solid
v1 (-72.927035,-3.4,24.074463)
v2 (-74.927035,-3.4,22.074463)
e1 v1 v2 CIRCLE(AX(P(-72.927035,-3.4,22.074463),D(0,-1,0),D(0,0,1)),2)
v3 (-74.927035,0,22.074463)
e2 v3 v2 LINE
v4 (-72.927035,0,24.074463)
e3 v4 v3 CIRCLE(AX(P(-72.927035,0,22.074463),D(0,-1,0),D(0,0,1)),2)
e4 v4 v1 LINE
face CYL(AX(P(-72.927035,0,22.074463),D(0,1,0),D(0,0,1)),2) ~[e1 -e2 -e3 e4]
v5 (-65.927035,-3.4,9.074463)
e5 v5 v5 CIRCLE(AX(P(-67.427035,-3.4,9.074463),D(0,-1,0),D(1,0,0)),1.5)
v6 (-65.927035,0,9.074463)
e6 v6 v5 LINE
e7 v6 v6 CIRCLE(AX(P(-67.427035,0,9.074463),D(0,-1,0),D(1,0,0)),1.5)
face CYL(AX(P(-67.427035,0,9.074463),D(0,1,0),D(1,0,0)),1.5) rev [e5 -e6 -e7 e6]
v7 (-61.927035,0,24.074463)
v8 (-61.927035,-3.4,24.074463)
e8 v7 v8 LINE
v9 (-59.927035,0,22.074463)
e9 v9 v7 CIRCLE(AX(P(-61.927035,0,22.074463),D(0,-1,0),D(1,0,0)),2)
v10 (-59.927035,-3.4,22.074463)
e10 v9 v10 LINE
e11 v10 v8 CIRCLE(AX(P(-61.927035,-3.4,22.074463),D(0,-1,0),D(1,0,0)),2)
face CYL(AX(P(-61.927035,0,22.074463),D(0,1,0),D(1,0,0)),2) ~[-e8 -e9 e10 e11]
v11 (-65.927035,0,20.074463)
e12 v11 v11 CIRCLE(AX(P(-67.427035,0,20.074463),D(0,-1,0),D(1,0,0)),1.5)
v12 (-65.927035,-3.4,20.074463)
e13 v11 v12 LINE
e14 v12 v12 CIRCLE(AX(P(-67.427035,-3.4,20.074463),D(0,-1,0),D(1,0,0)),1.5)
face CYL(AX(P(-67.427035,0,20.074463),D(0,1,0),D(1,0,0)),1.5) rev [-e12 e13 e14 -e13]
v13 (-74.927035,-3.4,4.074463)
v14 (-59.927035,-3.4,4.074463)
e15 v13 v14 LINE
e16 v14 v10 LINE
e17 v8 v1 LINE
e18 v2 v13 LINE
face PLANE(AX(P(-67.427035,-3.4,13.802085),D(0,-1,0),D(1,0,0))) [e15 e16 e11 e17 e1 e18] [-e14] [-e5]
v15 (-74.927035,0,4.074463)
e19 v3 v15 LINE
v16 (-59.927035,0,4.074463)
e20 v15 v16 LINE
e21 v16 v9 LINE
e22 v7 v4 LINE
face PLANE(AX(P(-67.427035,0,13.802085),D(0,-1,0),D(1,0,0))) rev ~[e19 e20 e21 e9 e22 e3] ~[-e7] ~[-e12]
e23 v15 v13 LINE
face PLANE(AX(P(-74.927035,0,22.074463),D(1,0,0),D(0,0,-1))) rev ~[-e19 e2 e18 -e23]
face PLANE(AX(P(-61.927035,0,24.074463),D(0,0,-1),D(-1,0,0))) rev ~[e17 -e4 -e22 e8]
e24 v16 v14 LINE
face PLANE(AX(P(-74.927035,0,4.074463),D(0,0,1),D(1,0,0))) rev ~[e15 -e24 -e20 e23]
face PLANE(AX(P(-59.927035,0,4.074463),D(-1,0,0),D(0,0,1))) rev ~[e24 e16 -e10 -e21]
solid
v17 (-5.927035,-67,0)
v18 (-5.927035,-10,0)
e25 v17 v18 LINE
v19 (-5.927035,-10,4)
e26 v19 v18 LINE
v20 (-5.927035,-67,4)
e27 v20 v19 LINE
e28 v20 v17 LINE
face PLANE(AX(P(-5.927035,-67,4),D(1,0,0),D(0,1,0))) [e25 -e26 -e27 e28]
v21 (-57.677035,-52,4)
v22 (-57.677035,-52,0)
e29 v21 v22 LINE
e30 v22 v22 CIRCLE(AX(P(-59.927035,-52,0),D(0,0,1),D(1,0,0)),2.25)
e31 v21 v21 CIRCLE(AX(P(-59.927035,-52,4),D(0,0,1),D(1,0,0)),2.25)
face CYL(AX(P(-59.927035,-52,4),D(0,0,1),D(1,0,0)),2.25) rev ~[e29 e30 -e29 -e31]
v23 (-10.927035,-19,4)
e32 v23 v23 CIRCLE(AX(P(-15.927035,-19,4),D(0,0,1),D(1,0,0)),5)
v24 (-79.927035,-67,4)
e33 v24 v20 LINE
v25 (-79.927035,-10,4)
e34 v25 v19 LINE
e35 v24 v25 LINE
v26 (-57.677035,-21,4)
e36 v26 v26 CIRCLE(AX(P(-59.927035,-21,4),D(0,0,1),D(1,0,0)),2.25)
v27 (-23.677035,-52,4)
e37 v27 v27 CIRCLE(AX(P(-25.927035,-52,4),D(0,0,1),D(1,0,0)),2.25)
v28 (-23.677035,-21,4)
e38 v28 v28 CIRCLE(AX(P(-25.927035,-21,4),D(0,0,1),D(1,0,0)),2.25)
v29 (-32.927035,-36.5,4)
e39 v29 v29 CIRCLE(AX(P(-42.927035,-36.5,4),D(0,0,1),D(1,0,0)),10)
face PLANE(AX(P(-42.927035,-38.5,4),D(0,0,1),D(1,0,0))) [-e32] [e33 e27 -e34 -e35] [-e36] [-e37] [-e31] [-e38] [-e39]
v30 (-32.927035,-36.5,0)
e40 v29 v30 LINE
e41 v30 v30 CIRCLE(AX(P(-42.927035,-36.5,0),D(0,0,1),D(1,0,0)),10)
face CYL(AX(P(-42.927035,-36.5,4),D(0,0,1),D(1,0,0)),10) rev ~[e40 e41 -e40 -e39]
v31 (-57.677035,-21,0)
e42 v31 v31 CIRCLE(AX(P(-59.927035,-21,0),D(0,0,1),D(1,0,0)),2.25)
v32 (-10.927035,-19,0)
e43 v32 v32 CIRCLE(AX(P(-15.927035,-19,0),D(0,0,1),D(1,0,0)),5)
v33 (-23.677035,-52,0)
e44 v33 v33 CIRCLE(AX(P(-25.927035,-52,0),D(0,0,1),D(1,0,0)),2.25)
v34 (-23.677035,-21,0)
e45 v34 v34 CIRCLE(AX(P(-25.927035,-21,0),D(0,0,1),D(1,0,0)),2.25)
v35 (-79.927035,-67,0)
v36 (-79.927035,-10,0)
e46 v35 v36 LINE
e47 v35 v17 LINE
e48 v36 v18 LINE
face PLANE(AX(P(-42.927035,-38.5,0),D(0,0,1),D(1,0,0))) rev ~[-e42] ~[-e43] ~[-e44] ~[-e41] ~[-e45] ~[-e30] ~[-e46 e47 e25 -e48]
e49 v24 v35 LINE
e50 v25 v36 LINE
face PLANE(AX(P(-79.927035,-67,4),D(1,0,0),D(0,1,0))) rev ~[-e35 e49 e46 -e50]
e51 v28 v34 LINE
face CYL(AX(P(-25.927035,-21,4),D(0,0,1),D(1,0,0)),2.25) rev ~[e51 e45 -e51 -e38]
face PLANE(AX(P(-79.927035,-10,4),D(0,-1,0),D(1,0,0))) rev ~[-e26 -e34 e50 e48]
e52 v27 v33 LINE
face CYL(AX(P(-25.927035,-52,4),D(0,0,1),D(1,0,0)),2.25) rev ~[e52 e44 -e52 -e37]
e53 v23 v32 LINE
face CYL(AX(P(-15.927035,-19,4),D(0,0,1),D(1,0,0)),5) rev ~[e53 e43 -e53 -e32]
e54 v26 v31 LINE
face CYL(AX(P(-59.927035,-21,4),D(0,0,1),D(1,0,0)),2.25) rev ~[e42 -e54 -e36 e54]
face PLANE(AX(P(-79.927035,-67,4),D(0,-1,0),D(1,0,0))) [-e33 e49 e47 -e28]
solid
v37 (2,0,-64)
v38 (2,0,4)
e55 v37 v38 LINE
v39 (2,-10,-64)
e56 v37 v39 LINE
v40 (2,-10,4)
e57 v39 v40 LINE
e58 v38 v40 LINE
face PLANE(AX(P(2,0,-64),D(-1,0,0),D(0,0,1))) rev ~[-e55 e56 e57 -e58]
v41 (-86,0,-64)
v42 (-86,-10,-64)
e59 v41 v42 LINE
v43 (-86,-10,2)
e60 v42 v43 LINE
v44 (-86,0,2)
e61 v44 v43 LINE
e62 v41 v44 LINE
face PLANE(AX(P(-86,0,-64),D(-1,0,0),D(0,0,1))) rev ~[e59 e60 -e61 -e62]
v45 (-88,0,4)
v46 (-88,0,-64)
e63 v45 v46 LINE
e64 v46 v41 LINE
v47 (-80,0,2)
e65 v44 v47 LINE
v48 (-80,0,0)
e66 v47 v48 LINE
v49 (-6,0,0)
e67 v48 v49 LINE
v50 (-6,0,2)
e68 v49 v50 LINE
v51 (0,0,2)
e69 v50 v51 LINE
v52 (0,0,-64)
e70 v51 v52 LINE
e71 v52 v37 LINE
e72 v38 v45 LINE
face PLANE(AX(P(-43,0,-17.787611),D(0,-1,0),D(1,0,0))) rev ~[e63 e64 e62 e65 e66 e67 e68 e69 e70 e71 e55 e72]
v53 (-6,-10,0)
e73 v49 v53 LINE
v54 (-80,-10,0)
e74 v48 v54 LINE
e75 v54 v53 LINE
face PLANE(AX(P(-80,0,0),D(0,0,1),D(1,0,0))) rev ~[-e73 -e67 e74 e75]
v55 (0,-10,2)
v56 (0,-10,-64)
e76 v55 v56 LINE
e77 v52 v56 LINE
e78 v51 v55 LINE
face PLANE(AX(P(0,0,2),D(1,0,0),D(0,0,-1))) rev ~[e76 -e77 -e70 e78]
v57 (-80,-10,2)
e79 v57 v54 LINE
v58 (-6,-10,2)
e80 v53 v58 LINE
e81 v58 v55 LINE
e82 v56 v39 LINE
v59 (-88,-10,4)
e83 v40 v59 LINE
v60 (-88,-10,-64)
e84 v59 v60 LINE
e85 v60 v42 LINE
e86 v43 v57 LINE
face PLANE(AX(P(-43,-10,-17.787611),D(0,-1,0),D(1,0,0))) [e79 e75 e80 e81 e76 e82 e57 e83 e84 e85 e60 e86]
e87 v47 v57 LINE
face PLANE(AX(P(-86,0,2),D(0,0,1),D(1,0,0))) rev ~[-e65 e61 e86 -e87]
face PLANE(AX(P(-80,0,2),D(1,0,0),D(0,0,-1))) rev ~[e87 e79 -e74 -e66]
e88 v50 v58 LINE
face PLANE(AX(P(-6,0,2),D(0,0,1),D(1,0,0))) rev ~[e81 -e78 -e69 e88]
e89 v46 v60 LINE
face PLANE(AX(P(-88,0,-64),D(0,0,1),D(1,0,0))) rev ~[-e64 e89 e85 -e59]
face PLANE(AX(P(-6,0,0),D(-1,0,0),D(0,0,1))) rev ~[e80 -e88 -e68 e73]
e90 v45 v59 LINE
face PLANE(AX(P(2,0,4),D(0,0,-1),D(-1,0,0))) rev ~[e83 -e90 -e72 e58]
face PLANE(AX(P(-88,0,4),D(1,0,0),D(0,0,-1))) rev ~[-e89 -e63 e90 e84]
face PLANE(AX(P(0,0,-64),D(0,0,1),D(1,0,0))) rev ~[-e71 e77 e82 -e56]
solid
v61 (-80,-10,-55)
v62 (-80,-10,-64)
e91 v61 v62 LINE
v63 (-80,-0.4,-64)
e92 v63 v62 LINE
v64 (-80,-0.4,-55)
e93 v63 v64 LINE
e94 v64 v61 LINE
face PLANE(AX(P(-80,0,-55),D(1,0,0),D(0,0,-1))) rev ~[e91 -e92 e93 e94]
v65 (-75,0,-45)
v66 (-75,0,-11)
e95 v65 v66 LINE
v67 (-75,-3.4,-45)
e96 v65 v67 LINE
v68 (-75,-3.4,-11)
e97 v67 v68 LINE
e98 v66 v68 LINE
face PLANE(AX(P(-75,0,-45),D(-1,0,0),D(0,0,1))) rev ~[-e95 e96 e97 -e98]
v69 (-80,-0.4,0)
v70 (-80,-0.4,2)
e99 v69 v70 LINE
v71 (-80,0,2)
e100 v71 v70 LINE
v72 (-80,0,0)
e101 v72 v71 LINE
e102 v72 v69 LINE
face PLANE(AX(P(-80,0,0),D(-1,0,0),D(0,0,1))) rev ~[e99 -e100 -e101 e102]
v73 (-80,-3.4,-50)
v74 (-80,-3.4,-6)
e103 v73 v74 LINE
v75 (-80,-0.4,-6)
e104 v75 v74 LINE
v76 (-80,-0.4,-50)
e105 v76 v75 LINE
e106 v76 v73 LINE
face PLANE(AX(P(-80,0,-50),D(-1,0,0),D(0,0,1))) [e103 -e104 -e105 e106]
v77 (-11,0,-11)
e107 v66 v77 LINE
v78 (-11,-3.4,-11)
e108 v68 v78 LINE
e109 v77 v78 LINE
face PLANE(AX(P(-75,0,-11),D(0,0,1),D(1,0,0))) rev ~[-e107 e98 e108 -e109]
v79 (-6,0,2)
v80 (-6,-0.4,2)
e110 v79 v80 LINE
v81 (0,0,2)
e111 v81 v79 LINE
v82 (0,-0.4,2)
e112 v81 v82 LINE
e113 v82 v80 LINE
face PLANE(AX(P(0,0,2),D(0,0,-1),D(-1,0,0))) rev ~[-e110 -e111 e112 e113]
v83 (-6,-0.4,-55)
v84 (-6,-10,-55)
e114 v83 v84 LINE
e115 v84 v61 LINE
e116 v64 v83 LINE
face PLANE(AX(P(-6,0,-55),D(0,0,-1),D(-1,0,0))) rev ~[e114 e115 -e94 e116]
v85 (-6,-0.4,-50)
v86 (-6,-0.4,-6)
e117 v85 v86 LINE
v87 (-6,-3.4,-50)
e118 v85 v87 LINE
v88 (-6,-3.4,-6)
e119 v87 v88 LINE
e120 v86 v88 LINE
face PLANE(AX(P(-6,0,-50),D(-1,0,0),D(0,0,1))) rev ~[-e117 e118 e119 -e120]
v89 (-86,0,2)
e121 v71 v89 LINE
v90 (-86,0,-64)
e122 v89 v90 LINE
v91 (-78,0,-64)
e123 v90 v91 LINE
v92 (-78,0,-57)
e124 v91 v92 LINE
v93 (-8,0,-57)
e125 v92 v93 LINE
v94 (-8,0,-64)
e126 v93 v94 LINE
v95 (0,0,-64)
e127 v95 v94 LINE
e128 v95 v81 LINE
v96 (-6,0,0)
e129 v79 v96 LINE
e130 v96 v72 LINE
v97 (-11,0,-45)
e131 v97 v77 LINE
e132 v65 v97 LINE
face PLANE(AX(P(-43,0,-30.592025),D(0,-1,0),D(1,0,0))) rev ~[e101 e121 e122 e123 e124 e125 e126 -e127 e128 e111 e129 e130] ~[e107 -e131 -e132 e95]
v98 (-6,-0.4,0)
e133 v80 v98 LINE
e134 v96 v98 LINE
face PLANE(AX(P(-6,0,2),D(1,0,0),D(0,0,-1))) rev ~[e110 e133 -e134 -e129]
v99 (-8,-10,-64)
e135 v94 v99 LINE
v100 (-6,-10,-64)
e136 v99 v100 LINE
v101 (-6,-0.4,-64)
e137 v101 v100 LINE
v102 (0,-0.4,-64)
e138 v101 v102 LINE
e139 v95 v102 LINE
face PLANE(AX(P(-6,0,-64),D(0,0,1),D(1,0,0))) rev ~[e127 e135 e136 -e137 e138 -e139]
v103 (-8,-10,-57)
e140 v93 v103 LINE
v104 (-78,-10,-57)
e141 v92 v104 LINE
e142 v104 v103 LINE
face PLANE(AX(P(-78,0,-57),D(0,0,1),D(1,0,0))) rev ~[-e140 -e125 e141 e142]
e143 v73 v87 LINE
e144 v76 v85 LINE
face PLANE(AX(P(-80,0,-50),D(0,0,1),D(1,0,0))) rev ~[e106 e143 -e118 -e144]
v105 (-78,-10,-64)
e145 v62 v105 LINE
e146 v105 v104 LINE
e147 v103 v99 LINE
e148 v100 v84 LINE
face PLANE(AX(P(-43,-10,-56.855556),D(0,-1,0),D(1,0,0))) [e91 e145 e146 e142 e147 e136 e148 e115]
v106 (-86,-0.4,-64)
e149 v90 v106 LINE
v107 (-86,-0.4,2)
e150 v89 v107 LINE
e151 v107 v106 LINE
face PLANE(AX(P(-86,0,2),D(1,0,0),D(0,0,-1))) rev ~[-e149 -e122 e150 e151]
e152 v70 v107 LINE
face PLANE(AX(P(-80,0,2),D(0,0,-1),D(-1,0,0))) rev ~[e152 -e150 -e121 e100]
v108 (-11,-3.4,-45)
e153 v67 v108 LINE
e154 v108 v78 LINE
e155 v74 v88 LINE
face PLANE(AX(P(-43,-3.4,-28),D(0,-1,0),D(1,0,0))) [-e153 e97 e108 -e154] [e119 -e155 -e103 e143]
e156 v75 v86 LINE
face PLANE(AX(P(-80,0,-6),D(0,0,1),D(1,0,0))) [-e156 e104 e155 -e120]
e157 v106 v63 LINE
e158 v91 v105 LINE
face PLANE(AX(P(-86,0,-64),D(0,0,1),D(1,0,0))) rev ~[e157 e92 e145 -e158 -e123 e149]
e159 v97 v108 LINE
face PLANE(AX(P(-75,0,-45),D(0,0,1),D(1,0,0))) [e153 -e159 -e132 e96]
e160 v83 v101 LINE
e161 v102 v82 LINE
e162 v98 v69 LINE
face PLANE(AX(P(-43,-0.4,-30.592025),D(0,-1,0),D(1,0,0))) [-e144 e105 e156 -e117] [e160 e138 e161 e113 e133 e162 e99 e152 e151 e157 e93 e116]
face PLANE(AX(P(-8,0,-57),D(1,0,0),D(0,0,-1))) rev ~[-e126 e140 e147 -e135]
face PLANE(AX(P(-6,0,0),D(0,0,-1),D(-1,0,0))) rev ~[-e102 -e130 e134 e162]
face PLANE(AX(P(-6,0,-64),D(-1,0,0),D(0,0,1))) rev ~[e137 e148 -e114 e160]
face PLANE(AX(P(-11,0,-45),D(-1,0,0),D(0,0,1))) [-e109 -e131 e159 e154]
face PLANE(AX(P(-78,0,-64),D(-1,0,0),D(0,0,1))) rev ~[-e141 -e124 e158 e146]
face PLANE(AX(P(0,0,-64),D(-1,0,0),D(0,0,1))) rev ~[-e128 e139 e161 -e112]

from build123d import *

# Parameters (mm, degrees)
F2_DEPTH = 10
F4_W     = 74
F4_H     = 57
F4_R     = 2.25
F4_R_2   = 10
F4_R_3   = 5
F5_DEPTH = 4
F0_W     = 74
F0_H     = 44
F6_DEPTH = 0.4
F0_W_2   = 64
F0_H_2   = 34
F7_DEPTH = 3.4
F8_R     = 1.5
F9_DEPTH = 3.4


with BuildPart() as f2:
    # F0 (on Front) → F2 (new body)
    with BuildSketch(Plane.XZ):
        Polygon((0, 2), (0, -64), (2, -64), (2, 4), (-88, 4), (-88, -64), (-86, -64), (-86, 2), (-80, 2), (-80, 0), (-6, 0), (-6, 2), align=None)
    extrude(amount=F2_DEPTH)


with BuildPart() as f2b:
    # F0 (on Front) → F2, piece 2 (new body)
    with BuildSketch(Plane.XZ):
        Polygon((-6, -64), (-6, -55), (-80, -55), (-80, -64), (-78, -64), (-78, -57), (-8, -57), (-8, -64), align=None)
    extrude(amount=F2_DEPTH)

    # F0 (on Front) → F6 (join)
    with BuildSketch(Plane.XZ):
        Polygon((-80, -55), (-6, -55), (-6, -64), (0, -64), (0, 2), (-6, 2), (-6, 0), (-80, 0), (-80, 2), (-86, 2), (-86, -64), (-80, -64), align=None)
        with Locations((-43, -28)):
            Rectangle(F0_W, F0_H, mode=Mode.SUBTRACT)
    extrude(amount=F6_DEPTH)

    # F0 (on Front) → F7 (join)
    with BuildSketch(Plane.XZ):
        with Locations((-43, -28)):
            Rectangle(F0_W, F0_H)
        with Locations((-43, -28)):
            Rectangle(F0_W_2, F0_H_2, mode=Mode.SUBTRACT)
    extrude(amount=F7_DEPTH)


with BuildPart() as f5:
    # F4 (on face) → F5 (new body, through all)
    with BuildSketch(Plane.XY.offset(4)):
        with Locations((-42.927035287, -38.5)):
            Rectangle(F4_W, F4_H)
        with Locations((-59.927035287, -52)):
            Circle(F4_R, mode=Mode.SUBTRACT)
        with Locations((-25.927035287, -52)):
            Circle(F4_R, mode=Mode.SUBTRACT)
        with Locations((-42.927035287, -36.5)):
            Circle(F4_R_2, mode=Mode.SUBTRACT)
        with Locations((-59.927035287, -21)):
            Circle(F4_R, mode=Mode.SUBTRACT)
        with Locations((-25.927035287, -21)):
            Circle(F4_R, mode=Mode.SUBTRACT)
        with Locations((-15.927035287, -19)):
            Circle(F4_R_3, mode=Mode.SUBTRACT)
    extrude(amount=-F5_DEPTH)


with BuildPart() as f9:
    # F8 (on Front) → F9 (new body)
    with BuildSketch(Plane.XZ):
        with BuildLine():
            Line((-74.927035287, 4.0744631551), (-59.927035287, 4.0744631551))
            Line((-59.927035287, 4.0744631551), (-59.927035287, 22.0744631551))
            ThreePointArc((-59.927035287, 22.0744631551), (-60.5128217246, 23.4886767175), (-61.927035287, 24.0744631551))
            Line((-61.927035287, 24.0744631551), (-72.927035287, 24.0744631551))
            ThreePointArc((-72.927035287, 24.0744631551), (-74.3412488494, 23.4886767175), (-74.927035287, 22.0744631551))
            Line((-74.927035287, 22.0744631551), (-74.927035287, 4.0744631551))
        make_face()
        with Locations((-67.427035287, 9.0744631551)):
            Circle(F8_R, mode=Mode.SUBTRACT)
        with Locations((-67.427035287, 20.0744631551)):
            Circle(F8_R, mode=Mode.SUBTRACT)
    extrude(amount=F9_DEPTH)


solid = Compound([f2.part, f2b.part, f5.part, f9.part])
